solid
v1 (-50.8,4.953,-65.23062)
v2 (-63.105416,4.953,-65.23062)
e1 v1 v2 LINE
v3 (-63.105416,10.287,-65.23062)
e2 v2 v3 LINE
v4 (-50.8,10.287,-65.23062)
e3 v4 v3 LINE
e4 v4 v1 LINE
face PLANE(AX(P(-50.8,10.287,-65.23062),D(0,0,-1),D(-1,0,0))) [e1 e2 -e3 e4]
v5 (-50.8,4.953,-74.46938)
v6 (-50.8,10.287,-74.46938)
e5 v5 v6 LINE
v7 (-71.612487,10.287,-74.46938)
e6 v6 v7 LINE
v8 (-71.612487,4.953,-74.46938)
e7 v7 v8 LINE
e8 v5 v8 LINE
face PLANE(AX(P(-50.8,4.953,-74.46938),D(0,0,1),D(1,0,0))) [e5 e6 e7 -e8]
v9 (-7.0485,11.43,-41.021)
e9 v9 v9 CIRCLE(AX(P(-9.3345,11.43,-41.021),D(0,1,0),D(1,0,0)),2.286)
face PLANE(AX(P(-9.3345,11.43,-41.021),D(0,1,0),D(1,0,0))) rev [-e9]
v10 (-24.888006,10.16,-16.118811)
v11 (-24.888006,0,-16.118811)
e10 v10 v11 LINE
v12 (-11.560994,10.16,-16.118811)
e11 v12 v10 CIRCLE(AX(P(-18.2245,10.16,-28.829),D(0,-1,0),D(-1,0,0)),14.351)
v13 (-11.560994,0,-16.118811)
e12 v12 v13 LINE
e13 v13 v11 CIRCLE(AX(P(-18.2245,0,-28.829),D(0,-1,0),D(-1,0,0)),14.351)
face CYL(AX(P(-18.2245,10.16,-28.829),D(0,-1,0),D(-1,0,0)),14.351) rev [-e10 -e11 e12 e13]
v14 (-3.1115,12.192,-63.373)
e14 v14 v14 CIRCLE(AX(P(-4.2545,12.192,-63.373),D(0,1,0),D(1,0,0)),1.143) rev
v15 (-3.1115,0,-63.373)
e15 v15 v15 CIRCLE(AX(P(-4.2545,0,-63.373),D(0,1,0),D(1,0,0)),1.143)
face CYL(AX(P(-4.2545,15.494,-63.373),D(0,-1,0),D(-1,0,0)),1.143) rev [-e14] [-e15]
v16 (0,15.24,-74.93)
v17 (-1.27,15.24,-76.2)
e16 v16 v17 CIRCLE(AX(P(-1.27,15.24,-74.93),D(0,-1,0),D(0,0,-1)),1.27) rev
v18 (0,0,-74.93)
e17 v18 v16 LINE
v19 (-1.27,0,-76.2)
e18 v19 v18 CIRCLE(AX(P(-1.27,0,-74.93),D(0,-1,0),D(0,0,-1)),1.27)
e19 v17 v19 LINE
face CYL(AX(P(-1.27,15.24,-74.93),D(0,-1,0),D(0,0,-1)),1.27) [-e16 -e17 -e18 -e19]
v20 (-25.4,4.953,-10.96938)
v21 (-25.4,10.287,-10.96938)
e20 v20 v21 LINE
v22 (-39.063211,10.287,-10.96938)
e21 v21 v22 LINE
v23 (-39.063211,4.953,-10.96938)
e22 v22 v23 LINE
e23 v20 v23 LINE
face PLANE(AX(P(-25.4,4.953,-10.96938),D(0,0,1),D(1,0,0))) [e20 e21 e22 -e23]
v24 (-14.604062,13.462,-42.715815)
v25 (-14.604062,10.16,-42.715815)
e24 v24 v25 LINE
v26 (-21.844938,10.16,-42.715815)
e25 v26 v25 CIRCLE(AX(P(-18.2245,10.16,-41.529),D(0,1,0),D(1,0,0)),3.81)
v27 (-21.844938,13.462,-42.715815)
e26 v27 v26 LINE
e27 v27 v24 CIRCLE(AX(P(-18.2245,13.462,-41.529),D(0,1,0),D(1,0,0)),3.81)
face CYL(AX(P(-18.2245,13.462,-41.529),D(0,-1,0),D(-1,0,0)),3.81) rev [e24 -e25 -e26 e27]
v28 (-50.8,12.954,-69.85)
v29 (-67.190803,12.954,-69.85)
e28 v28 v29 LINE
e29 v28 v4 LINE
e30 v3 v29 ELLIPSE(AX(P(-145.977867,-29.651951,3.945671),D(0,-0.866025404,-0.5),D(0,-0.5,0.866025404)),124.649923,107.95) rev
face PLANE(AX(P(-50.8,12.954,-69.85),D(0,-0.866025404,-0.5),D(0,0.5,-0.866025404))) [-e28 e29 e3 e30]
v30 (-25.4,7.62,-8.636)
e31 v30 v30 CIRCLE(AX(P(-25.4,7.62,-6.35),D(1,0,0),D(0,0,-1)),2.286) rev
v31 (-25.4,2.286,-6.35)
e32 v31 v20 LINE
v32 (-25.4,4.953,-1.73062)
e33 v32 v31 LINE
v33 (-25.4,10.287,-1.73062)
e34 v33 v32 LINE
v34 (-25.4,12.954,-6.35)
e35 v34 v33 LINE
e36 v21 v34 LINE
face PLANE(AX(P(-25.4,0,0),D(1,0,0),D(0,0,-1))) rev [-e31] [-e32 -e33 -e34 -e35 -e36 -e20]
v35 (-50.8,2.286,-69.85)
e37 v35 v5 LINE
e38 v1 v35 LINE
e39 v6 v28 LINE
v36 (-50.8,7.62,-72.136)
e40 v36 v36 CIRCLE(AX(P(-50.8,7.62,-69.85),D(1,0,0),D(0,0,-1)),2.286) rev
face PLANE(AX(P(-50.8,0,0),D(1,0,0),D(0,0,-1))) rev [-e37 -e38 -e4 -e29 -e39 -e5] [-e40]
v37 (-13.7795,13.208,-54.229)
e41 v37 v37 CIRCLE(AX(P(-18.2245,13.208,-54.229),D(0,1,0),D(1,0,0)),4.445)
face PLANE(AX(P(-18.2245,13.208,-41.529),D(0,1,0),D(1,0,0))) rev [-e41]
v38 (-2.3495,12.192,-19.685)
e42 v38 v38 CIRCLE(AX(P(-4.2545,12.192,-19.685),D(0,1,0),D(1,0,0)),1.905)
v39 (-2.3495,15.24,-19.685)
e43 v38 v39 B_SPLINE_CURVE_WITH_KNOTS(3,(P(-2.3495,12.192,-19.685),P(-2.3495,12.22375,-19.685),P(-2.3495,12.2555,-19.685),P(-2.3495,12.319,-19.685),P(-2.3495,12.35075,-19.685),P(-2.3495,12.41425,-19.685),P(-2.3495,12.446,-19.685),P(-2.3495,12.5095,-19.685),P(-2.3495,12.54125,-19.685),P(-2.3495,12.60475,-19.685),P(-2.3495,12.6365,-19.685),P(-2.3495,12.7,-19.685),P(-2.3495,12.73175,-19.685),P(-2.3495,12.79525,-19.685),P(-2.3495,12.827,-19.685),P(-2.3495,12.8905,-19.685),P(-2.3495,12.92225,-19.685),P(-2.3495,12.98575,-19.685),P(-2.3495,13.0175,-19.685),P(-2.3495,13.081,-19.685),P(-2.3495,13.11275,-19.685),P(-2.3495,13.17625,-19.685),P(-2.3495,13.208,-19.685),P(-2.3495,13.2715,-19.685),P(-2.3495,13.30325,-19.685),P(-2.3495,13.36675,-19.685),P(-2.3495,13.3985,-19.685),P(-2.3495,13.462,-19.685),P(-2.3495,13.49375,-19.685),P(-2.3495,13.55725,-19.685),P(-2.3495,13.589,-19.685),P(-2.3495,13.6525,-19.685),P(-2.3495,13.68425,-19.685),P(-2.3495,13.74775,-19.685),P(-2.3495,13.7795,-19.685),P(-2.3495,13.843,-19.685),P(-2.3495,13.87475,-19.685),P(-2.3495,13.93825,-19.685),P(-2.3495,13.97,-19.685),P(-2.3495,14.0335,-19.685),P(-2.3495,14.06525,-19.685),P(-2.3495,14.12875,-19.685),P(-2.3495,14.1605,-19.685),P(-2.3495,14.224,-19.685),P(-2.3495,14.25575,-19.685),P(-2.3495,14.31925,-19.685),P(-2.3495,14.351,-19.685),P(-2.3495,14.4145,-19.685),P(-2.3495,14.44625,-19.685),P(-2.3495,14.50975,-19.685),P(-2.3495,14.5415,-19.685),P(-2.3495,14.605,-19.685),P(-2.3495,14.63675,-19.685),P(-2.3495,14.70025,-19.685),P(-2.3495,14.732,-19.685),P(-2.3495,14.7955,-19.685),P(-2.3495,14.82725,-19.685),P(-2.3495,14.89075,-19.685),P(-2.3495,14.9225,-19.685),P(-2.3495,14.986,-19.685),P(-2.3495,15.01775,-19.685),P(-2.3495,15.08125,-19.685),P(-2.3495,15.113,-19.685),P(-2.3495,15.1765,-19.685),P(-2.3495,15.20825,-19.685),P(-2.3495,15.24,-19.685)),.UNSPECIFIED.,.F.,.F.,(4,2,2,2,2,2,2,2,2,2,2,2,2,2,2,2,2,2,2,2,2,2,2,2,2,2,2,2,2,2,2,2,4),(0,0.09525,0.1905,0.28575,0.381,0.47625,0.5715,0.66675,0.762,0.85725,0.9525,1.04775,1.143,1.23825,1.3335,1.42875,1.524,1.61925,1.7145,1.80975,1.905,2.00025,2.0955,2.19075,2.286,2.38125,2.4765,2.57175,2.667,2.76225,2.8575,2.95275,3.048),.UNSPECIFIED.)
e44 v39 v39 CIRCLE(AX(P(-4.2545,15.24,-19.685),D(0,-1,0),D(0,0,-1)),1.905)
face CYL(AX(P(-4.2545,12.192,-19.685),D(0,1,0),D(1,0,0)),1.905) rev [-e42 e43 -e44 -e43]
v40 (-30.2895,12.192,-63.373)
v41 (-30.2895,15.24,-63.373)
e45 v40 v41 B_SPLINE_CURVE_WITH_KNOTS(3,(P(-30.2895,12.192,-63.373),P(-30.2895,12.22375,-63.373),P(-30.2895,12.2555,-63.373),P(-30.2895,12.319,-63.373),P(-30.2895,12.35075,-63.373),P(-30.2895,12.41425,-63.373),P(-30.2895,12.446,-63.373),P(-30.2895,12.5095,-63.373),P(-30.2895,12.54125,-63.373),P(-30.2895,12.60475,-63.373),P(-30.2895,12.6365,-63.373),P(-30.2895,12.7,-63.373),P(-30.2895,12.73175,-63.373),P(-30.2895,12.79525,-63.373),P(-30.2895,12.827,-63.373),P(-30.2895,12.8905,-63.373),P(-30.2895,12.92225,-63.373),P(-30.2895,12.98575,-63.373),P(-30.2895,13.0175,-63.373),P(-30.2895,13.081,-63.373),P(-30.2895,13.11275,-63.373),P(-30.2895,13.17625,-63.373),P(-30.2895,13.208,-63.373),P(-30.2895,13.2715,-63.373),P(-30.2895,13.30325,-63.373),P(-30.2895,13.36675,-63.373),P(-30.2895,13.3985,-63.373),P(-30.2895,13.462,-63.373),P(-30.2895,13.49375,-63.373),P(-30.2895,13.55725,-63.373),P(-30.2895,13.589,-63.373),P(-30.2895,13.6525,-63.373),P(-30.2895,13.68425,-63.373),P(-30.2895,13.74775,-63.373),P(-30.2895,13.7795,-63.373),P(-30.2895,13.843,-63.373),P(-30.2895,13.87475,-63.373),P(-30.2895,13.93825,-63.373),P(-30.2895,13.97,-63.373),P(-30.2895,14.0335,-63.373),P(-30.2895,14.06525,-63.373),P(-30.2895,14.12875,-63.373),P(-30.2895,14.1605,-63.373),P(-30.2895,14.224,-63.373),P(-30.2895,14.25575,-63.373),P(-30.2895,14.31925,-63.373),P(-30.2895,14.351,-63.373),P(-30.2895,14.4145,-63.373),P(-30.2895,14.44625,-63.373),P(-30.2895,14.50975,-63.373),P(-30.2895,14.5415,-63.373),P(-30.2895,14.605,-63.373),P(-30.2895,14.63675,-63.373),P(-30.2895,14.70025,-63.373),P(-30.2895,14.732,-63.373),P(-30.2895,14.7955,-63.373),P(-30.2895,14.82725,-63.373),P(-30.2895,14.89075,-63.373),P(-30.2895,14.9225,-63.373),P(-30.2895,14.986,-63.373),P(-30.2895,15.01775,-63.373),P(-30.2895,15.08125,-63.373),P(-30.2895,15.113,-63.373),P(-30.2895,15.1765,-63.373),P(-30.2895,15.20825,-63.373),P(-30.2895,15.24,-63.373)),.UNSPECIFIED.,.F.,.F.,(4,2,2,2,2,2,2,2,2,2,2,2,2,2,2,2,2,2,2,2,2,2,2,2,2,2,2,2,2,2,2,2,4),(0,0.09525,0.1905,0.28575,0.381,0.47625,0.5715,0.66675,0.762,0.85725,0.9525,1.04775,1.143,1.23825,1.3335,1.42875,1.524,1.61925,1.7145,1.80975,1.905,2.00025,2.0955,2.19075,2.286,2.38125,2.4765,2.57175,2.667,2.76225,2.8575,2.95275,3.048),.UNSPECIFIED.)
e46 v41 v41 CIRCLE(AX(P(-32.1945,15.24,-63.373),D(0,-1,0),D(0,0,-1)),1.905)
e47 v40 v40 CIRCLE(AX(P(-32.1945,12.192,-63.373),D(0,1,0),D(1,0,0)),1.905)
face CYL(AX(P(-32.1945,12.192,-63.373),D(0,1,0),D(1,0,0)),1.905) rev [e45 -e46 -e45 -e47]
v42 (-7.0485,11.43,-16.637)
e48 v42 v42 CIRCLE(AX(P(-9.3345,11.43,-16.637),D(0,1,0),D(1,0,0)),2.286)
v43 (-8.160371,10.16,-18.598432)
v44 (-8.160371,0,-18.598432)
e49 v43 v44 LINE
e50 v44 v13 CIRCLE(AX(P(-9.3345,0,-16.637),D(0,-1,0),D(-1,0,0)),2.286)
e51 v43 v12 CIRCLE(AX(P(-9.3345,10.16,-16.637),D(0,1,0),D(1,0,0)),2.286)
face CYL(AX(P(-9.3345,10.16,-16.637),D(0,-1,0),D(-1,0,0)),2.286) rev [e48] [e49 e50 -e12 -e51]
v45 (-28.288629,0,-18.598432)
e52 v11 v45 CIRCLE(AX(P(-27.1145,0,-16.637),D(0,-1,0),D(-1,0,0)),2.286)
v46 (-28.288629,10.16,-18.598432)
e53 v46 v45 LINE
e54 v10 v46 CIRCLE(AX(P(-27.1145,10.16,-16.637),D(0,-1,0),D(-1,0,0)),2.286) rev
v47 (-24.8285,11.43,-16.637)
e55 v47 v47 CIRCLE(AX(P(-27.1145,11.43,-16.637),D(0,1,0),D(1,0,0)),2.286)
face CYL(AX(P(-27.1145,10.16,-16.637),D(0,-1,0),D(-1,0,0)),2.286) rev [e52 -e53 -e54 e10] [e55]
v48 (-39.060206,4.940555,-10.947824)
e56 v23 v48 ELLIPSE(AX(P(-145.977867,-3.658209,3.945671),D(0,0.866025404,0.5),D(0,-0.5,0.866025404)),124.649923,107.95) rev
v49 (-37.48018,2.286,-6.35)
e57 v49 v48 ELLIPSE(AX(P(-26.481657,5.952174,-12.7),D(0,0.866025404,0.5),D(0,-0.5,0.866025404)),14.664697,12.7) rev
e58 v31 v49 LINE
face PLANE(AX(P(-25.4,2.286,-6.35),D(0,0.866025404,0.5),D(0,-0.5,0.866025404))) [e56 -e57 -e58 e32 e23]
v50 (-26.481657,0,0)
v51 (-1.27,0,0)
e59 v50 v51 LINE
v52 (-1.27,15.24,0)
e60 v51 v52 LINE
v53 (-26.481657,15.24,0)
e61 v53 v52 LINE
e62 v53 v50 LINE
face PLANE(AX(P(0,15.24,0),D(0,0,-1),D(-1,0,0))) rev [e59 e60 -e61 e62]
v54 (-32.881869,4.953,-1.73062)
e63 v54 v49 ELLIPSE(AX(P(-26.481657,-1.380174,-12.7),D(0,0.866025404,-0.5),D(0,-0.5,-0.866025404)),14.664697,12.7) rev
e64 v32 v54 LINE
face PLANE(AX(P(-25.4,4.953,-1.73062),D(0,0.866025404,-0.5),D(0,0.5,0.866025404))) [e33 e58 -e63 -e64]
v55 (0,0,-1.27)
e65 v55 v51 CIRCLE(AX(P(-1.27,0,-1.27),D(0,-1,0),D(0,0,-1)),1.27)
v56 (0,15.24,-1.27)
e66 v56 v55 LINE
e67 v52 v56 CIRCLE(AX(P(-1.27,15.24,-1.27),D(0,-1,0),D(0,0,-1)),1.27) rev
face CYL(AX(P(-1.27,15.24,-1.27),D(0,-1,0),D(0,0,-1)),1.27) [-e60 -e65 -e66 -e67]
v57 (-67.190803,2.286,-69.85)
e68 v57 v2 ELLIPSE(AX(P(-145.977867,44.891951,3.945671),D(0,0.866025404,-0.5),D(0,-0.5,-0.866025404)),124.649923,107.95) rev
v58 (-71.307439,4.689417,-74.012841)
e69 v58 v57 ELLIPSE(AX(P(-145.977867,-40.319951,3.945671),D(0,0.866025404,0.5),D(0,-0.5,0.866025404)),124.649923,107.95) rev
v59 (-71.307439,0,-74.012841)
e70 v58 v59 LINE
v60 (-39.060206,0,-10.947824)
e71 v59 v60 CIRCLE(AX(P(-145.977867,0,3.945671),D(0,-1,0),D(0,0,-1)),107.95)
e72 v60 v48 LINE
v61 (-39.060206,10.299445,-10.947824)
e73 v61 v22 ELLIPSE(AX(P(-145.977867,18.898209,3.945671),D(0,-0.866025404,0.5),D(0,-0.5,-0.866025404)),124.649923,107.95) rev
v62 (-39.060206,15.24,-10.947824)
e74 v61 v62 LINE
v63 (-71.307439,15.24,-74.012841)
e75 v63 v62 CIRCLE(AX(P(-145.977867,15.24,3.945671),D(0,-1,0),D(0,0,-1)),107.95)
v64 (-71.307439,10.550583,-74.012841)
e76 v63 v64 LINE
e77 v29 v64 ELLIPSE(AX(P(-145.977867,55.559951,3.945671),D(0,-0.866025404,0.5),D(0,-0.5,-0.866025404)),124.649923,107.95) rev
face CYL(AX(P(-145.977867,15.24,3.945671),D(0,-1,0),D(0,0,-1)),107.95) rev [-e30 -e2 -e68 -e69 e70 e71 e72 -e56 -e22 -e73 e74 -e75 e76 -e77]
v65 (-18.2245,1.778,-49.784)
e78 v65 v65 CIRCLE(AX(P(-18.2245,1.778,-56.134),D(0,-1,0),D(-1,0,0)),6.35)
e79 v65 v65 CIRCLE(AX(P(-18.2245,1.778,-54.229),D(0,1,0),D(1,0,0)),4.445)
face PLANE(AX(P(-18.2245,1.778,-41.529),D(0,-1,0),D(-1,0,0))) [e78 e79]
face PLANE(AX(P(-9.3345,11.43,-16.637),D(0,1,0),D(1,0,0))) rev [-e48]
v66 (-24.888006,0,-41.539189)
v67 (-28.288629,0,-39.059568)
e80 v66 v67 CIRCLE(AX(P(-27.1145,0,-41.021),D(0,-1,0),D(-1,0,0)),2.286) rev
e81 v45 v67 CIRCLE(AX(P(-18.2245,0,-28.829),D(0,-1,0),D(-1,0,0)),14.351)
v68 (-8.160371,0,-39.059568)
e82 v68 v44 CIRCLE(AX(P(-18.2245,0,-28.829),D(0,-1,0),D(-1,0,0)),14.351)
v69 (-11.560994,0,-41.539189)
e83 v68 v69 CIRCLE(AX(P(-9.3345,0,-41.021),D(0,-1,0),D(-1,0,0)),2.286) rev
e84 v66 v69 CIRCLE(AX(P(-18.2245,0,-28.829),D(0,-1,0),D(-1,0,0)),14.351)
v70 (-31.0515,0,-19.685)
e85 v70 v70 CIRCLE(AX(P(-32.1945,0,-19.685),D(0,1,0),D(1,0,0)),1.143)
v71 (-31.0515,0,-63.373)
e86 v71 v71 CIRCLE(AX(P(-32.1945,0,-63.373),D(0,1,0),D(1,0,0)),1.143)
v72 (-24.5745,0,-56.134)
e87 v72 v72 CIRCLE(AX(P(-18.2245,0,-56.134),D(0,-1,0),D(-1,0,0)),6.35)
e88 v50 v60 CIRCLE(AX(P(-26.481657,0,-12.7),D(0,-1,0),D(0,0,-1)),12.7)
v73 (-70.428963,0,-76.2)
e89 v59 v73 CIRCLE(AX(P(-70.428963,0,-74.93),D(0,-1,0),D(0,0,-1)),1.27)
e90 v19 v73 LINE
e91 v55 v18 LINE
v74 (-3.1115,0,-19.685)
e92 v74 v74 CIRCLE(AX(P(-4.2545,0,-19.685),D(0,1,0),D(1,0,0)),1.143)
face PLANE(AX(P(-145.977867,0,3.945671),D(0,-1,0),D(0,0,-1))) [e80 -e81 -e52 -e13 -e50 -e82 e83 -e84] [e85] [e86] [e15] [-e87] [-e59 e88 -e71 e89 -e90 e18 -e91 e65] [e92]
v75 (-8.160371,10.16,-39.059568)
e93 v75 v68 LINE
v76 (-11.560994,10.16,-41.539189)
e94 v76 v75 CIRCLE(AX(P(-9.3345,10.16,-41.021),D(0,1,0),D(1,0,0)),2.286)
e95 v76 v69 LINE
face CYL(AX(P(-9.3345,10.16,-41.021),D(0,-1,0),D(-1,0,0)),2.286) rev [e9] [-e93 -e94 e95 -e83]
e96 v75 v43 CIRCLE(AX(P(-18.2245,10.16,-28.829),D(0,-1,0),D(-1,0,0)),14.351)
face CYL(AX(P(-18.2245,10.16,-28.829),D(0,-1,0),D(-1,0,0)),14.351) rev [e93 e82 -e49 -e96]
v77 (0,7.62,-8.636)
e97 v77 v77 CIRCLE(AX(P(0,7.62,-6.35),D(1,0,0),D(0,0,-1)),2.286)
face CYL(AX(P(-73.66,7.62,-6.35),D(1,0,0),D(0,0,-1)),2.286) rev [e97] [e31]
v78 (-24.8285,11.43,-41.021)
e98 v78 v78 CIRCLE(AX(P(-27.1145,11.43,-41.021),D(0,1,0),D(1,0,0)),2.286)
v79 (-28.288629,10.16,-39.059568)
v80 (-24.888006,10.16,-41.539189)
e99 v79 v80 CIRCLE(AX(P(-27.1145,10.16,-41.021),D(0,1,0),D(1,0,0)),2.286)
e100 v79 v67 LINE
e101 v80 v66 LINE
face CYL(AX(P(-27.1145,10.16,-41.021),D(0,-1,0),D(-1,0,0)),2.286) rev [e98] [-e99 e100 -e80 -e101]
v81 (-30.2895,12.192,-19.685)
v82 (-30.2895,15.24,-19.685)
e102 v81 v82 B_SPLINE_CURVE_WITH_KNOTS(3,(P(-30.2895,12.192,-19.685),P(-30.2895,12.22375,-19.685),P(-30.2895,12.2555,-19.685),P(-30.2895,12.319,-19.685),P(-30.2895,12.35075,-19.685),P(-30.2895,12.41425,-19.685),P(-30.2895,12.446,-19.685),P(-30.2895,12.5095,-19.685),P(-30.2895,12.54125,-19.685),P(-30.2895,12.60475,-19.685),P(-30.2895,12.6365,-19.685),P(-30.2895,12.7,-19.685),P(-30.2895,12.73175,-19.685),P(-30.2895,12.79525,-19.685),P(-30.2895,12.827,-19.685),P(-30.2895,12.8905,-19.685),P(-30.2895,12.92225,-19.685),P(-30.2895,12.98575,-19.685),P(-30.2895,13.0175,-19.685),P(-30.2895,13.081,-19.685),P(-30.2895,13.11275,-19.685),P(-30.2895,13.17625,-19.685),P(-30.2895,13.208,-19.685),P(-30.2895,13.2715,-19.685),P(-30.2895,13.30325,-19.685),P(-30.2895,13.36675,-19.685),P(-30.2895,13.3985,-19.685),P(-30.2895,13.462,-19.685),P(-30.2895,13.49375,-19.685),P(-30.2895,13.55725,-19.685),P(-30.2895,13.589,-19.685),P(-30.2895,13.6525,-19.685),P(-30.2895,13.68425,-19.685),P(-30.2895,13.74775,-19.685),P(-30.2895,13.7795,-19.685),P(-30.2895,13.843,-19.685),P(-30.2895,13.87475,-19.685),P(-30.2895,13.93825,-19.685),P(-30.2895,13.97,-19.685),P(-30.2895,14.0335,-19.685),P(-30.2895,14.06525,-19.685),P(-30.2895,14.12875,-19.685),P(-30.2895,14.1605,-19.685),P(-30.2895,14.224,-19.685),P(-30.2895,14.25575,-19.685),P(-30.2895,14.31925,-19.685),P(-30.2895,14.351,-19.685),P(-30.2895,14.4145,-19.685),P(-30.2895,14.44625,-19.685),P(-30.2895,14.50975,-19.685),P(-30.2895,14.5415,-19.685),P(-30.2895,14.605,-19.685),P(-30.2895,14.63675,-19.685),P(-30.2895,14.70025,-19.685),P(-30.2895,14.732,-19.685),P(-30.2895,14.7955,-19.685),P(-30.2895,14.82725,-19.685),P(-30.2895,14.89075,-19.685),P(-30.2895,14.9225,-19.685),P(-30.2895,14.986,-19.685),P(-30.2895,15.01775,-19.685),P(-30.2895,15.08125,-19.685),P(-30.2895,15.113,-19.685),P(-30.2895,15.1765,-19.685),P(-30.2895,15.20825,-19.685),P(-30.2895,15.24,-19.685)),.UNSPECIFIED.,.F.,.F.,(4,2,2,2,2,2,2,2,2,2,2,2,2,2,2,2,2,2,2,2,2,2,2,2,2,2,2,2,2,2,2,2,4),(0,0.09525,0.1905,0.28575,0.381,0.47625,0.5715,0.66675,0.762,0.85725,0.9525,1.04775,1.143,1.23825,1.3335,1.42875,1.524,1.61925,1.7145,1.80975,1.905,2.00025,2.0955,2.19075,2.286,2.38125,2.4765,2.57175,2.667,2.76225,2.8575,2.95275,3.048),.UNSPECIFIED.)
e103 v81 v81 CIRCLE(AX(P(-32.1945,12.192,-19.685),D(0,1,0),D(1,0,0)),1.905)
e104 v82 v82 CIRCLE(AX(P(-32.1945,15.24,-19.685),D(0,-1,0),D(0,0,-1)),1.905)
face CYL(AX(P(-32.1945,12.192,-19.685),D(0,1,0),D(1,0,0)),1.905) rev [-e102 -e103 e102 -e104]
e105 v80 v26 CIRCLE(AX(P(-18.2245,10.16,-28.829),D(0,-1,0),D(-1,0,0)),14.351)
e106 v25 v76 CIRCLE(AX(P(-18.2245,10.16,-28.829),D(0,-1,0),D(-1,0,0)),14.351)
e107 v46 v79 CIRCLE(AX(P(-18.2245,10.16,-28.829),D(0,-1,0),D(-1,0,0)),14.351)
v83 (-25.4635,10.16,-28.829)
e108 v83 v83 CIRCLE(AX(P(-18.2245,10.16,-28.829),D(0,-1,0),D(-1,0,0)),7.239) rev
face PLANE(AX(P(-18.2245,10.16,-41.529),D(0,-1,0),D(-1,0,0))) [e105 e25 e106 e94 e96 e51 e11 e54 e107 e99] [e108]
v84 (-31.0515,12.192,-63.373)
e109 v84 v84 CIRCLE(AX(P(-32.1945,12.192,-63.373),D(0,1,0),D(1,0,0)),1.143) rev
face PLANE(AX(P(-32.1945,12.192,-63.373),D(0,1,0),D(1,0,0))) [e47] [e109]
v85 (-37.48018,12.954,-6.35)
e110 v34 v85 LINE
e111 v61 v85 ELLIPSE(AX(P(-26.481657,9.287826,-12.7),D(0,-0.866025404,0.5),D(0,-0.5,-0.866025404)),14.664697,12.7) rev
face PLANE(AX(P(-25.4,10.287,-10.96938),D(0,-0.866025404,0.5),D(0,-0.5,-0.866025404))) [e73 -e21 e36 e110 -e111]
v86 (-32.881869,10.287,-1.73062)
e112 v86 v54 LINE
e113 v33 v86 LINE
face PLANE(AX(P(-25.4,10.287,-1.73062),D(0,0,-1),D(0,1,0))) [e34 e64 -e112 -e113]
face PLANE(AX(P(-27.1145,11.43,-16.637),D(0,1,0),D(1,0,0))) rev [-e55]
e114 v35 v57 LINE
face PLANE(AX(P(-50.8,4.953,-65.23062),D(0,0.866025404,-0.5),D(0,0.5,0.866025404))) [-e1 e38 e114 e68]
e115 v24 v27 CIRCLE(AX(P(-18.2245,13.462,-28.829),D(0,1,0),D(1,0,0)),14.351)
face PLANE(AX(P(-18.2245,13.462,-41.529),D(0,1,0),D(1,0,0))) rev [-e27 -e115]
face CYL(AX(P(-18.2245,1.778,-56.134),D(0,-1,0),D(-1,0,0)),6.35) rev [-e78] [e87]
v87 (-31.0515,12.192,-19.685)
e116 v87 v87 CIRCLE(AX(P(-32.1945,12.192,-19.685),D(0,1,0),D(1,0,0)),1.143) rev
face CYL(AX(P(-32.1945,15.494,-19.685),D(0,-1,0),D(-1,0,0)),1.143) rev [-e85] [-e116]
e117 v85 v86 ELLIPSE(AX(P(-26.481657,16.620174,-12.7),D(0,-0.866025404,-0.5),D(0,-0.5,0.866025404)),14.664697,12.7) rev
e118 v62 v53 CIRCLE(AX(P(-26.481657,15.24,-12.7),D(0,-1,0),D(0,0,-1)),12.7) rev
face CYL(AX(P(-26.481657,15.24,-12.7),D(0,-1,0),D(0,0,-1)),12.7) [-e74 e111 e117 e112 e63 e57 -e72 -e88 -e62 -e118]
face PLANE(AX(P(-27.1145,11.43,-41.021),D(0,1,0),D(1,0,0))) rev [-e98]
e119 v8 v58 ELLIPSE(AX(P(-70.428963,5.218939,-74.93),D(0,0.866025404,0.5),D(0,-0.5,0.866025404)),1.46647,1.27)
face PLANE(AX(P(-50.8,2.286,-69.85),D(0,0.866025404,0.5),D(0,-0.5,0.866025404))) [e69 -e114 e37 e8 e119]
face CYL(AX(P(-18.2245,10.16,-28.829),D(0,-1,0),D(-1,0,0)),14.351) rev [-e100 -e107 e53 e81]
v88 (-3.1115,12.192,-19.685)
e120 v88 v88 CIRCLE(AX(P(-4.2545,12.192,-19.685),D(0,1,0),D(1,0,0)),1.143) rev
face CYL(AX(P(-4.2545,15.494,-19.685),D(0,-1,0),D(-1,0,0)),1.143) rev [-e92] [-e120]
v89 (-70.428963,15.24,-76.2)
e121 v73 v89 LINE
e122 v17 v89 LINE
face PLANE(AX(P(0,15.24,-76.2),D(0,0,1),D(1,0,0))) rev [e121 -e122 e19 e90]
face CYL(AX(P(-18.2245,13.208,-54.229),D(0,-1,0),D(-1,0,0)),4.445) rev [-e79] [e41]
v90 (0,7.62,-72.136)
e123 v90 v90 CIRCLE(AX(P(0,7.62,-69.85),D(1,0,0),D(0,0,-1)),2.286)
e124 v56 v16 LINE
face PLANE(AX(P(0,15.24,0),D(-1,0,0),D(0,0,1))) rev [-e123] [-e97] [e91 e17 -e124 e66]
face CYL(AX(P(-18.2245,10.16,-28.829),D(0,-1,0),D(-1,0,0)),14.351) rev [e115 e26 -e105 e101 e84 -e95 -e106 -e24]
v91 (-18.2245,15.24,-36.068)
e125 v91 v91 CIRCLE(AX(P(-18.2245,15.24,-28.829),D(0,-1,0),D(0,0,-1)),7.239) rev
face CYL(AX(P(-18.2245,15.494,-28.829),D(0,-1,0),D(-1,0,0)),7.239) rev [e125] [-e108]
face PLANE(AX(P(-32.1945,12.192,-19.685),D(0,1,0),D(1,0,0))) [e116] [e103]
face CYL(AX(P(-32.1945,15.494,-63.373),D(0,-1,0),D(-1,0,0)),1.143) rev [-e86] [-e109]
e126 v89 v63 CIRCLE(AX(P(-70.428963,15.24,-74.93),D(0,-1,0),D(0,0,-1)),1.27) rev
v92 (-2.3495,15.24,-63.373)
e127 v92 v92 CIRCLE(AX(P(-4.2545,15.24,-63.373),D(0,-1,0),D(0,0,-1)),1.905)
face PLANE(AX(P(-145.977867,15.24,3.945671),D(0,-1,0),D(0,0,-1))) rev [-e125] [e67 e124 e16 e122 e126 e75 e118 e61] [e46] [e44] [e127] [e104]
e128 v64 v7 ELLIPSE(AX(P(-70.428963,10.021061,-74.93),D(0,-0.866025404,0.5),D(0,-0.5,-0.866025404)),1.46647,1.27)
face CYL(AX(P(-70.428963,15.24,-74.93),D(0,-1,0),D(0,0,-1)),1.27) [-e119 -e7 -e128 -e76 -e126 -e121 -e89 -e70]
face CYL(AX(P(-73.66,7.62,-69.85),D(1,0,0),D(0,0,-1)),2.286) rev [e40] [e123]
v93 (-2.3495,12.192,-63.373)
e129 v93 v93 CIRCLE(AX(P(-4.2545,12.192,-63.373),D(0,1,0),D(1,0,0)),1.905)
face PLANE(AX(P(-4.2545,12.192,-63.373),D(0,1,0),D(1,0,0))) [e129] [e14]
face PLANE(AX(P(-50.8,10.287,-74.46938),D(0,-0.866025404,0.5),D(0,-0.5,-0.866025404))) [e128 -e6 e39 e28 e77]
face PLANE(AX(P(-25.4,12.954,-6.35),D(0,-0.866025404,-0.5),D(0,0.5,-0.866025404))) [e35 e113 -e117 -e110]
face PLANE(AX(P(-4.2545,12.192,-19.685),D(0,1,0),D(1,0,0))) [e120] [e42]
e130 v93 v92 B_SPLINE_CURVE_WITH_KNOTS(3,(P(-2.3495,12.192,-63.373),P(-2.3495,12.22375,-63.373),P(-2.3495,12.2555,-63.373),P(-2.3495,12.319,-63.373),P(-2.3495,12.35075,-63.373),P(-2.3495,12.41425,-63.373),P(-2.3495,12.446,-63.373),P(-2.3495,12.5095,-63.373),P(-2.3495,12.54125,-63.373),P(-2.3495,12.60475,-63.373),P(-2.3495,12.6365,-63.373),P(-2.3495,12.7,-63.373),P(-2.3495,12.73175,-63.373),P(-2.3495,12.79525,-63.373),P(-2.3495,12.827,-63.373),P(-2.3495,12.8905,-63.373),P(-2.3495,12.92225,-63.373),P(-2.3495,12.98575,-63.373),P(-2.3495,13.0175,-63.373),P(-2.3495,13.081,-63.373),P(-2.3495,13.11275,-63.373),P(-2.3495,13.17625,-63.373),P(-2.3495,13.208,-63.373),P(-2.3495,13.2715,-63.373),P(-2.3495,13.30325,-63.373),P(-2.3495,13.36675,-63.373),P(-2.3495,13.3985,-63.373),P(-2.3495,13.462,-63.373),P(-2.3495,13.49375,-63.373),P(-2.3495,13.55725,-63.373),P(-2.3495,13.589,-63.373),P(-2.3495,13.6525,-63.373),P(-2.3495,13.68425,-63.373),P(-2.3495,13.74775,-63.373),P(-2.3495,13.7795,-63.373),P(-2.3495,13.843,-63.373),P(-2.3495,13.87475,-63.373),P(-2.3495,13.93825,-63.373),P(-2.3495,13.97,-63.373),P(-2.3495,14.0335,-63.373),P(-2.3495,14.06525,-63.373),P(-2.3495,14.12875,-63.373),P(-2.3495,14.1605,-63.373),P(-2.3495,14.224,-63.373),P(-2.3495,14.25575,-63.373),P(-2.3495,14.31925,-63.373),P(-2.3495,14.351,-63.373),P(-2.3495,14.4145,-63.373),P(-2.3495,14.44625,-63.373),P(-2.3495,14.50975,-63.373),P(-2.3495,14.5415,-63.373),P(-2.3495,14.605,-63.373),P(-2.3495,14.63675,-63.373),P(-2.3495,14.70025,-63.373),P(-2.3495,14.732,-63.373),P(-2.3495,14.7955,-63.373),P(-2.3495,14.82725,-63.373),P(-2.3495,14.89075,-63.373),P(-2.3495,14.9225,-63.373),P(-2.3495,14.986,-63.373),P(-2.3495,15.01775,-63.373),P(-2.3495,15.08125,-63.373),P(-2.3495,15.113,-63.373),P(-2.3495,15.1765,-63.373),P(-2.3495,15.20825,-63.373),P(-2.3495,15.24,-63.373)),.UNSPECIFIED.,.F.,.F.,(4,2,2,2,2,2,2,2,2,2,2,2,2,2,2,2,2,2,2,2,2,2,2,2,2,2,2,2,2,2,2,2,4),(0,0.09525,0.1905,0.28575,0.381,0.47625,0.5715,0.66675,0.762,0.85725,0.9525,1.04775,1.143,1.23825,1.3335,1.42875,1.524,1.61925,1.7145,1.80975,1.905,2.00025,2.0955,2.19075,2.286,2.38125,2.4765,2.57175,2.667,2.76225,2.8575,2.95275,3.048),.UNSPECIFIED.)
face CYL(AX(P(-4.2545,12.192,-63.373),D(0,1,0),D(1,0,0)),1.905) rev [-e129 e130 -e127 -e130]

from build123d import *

# Parameters (mm, degrees)
BOSS_EXTRUDE1_DEPTH   = 15.24
CAVITY1_OUTLINE_R     = 4.445
CAVITY1_OUTLINE_R_2   = 1.143
CAVITY1_DEPTH         = 10.16
CAVITY1_START         = 10.16
CAVITY1_2_OUTLINE_R   = 1.143
CAVITY1_2_OUTLINE_R_2 = 7.239
CAVITY1_2_DEPTH       = 5.08
CAVITY1_3_OUTLINE_R   = 4.445
CAVITY1_3_DEPTH       = 3.048
CAVITY1_4_DEPTH       = 1.778
CAVITY1_START_2       = 12.192
CAVITY1_5_OUTLINE_R   = 1.905
CAVITY1_5_OUTLINE_R_2 = 1.143
CAVITY1_5_DEPTH       = 3.048
CAVITY1_6_OUTLINE_R   = 2.286
CAVITY1_6_DEPTH       = 1.27
CAVITY1_START_3       = 13.208
CAVITY1_7_DEPTH       = 0.254
FILLET1_R             = 12.7
SKETCH2_R             = 2.286
CUT_EXTRUDE1_DEPTH    = 108.072373654
CUT_EXTRUDE2_DEPTH    = 50.8
CUT_EXTRUDE4_DEPTH    = 25.4
FILLET2_R             = 1.27


# Read off the part's stored shape, not the designer's step: Cavity1
with BuildPart() as part:
    # Sketch1 → Boss-Extrude1 (new body)
    with BuildSketch(Plane(origin=(0, 0, 0), x_dir=(1, 0, 0), z_dir=(0, 1, 0))):
        with BuildLine():
            Line((0, 0), (0, 76.2))
            Line((0, 76.2), (-73.66, 76.2))
            ThreePointArc((-73.66, 76.2), (-48.155396991, 41.704814738), (-38.1, 0))
            Line((-38.1, 0), (0, 0))
        make_face()
    extrude(amount=BOSS_EXTRUDE1_DEPTH)

    # Cavity1 outline → Cavity1 (cut)
    with BuildSketch(Plane(origin=(0, 0, 0), x_dir=(1, 0, 0), z_dir=(0, 1, 0))):
        with BuildLine():
            ThreePointArc((-11.560994253, 41.539188518), (-18.2245, 43.18), (-24.888005747, 41.539188518))
            ThreePointArc((-24.888005747, 41.539188518), (-28.461347552, 42.868105214), (-28.288628852, 39.059567504))
            ThreePointArc((-28.288628852, 39.059567504), (-32.5755, 28.829), (-28.288628852, 18.598432496))
            ThreePointArc((-28.288628852, 18.598432496), (-28.461347552, 14.789894786), (-24.888005747, 16.118811482))
            ThreePointArc((-24.888005747, 16.118811482), (-18.2245, 14.478), (-11.560994253, 16.118811482))
            ThreePointArc((-11.560994253, 16.118811482), (-7.987652448, 14.789894786), (-8.160371148, 18.598432496))
            ThreePointArc((-8.160371148, 18.598432496), (-3.8735, 28.829), (-8.160371148, 39.059567504))
            ThreePointArc((-8.160371148, 39.059567504), (-7.987652448, 42.868105214), (-11.560994253, 41.539188518))
        make_face()
        with Locations((-18.2245, 54.229)):
            Circle(CAVITY1_OUTLINE_R)
        with Locations((-4.2545, 63.373)):
            Circle(CAVITY1_OUTLINE_R_2)
        with Locations((-32.1945, 63.373)):
            Circle(CAVITY1_OUTLINE_R_2)
        with Locations((-4.2545, 19.685)):
            Circle(CAVITY1_OUTLINE_R_2)
        with Locations((-32.1945, 19.685)):
            Circle(CAVITY1_OUTLINE_R_2)
    extrude(amount=CAVITY1_DEPTH, mode=Mode.SUBTRACT)

    # Cavity1 2 outline → Cavity1 2 (cut)
    with BuildSketch(Plane(origin=(0, 0, 0), x_dir=(1, 0, 0), z_dir=(0, 1, 0)).offset(CAVITY1_START)):
        with Locations((-4.2545, 63.373)):
            Circle(CAVITY1_2_OUTLINE_R)
        with Locations((-32.1945, 63.373)):
            Circle(CAVITY1_2_OUTLINE_R)
        with Locations((-4.2545, 19.685)):
            Circle(CAVITY1_2_OUTLINE_R)
        with Locations((-32.1945, 19.685)):
            Circle(CAVITY1_2_OUTLINE_R)
        with Locations((-18.2245, 28.829)):
            Circle(CAVITY1_2_OUTLINE_R_2)
    extrude(amount=CAVITY1_2_DEPTH, mode=Mode.SUBTRACT)

    # Cavity1 3 outline → Cavity1 3 (cut)
    with BuildSketch(Plane(origin=(0, 0, 0), x_dir=(1, 0, 0), z_dir=(0, 1, 0)).offset(CAVITY1_START)):
        with BuildLine():
            ThreePointArc((-21.84493784, 42.715815), (-18.2245, 37.719), (-14.60406216, 42.715815))
            ThreePointArc((-14.60406216, 42.715815), (-18.2245, 43.18), (-21.84493784, 42.715815))
        make_face()
        with Locations((-18.2245, 54.229)):
            Circle(CAVITY1_3_OUTLINE_R)
    extrude(amount=CAVITY1_3_DEPTH, mode=Mode.SUBTRACT)

    # Cavity1 4 outline → Cavity1 4 (cut)
    with BuildSketch(Plane(origin=(0, 0, 0), x_dir=(1, 0, 0), z_dir=(0, 1, 0))):
        with BuildLine():
            Line((-16.979413564, 49.961941907), (-16.962599029, 49.910648336))
            ThreePointArc((-16.962599029, 49.910648336), (-13.643456381, 51.73666679), (-11.954738237, 55.127725966))
            Line((-11.954738237, 55.127725966), (-13.895987251, 53.218058667))
            ThreePointArc((-13.895987251, 53.218058667), (-14.996989185, 51.172662495), (-16.979413564, 49.961941907))
        make_face()
        with BuildLine():
            ThreePointArc((-17.321192174, 49.848577582), (-17.141450842, 49.87704351), (-16.962599029, 49.910648336))
            Line((-16.962599029, 49.910648336), (-16.979413564, 49.961941907))
            ThreePointArc((-16.979413564, 49.961941907), (-17.131364048, 49.920510846), (-17.284686925, 49.884488936))
            Line((-17.284686925, 49.884488936), (-17.321192174, 49.848577582))
        make_face()
        with BuildLine():
            Line((-19.469586436, 49.961941907), (-19.486400971, 49.910648336))
            ThreePointArc((-19.486400971, 49.910648336), (-19.307549158, 49.87704351), (-19.127807826, 49.848577582))
            Line((-19.127807826, 49.848577582), (-19.164313075, 49.884488936))
            ThreePointArc((-19.164313075, 49.884488936), (-19.317635952, 49.920510846), (-19.469586436, 49.961941907))
        make_face()
        with BuildLine():
            ThreePointArc((-24.494261763, 55.127725966), (-22.805543619, 51.73666679), (-19.486400971, 49.910648336))
            Line((-19.486400971, 49.910648336), (-19.469586436, 49.961941907))
            ThreePointArc((-19.469586436, 49.961941907), (-21.452010815, 51.172662495), (-22.553012749, 53.218058667))
            Line((-22.553012749, 53.218058667), (-24.494261763, 55.127725966))
        make_face()
        with BuildLine():
            ThreePointArc((-18.2245, 49.784), (-17.771693393, 49.800164971), (-17.321192174, 49.848577582))
            Line((-17.321192174, 49.848577582), (-17.284686925, 49.884488936))
            ThreePointArc((-17.284686925, 49.884488936), (-17.751914917, 49.809193631), (-18.2245, 49.784))
        make_face()
        with BuildLine():
            Line((-13.895987251, 53.218058667), (-11.954738237, 55.127725966))
            ThreePointArc((-11.954738237, 55.127725966), (-11.894591344, 55.629266009), (-11.8745, 56.134))
            ThreePointArc((-11.8745, 56.134), (-12.87382539, 59.553470897), (-15.557265738, 61.896669641))
            Line((-15.557265738, 61.896669641), (-16.701846661, 58.405068942))
            ThreePointArc((-16.701846661, 58.405068942), (-14.582644766, 56.7775124), (-13.7795, 54.229))
            ThreePointArc((-13.7795, 54.229), (-13.80871784, 53.720184793), (-13.895987251, 53.218058667))
        make_face()
        with BuildLine():
            Line((-19.164313075, 49.884488936), (-19.127807826, 49.848577582))
            ThreePointArc((-19.127807826, 49.848577582), (-18.677306607, 49.800164971), (-18.2245, 49.784))
            ThreePointArc((-18.2245, 49.784), (-18.697085083, 49.809193631), (-19.164313075, 49.884488936))
        make_face()
        with BuildLine():
            ThreePointArc((-20.891734262, 61.896669641), (-23.830044051, 59.117349777), (-24.494261763, 55.127725966))
            Line((-24.494261763, 55.127725966), (-22.553012749, 53.218058667))
            ThreePointArc((-22.553012749, 53.218058667), (-22.134142573, 56.3438806), (-19.747153339, 58.405068942))
            Line((-19.747153339, 58.405068942), (-20.891734262, 61.896669641))
        make_face()
        with BuildLine():
            ThreePointArc((-15.557265738, 61.896669641), (-18.2245, 62.484), (-20.891734262, 61.896669641))
            Line((-20.891734262, 61.896669641), (-19.747153339, 58.405068942))
            ThreePointArc((-19.747153339, 58.405068942), (-18.2245, 58.674), (-16.701846661, 58.405068942))
            Line((-16.701846661, 58.405068942), (-15.557265738, 61.896669641))
        make_face()
    extrude(amount=CAVITY1_4_DEPTH, mode=Mode.SUBTRACT)

    # Cavity1 5 outline → Cavity1 5 (cut)
    # profile 1 of 4: a face of its own
    with BuildSketch(Plane(origin=(0, 0, 0), x_dir=(1, 0, 0), z_dir=(0, 1, 0)).offset(CAVITY1_START_2)):
        with Locations((-4.2545, 63.373)):
            Circle(CAVITY1_5_OUTLINE_R)
        with Locations((-4.2545, 63.373)):
            Circle(CAVITY1_5_OUTLINE_R_2, mode=Mode.SUBTRACT)
    # profile 2 of 4: a face of its own
    with BuildSketch(Plane(origin=(0, 0, 0), x_dir=(1, 0, 0), z_dir=(0, 1, 0)).offset(CAVITY1_START_2)):
        with Locations((-32.1945, 63.373)):
            Circle(CAVITY1_5_OUTLINE_R)
        with Locations((-32.1945, 63.373)):
            Circle(CAVITY1_5_OUTLINE_R_2, mode=Mode.SUBTRACT)
    # profile 3 of 4: a face of its own
    with BuildSketch(Plane(origin=(0, 0, 0), x_dir=(1, 0, 0), z_dir=(0, 1, 0)).offset(CAVITY1_START_2)):
        with Locations((-4.2545, 19.685)):
            Circle(CAVITY1_5_OUTLINE_R)
        with Locations((-4.2545, 19.685)):
            Circle(CAVITY1_5_OUTLINE_R_2, mode=Mode.SUBTRACT)
    # profile 4 of 4: a face of its own
    with BuildSketch(Plane(origin=(0, 0, 0), x_dir=(1, 0, 0), z_dir=(0, 1, 0)).offset(CAVITY1_START_2)):
        with Locations((-32.1945, 19.685)):
            Circle(CAVITY1_5_OUTLINE_R)
        with Locations((-32.1945, 19.685)):
            Circle(CAVITY1_5_OUTLINE_R_2, mode=Mode.SUBTRACT)
    extrude(amount=CAVITY1_5_DEPTH, mode=Mode.SUBTRACT)

    # Cavity1 6 outline → Cavity1 6 (cut)
    with BuildSketch(Plane(origin=(0, 0, 0), x_dir=(1, 0, 0), z_dir=(0, 1, 0)).offset(CAVITY1_START)):
        with Locations((-9.3345, 41.021)):
            Circle(CAVITY1_6_OUTLINE_R)
        with Locations((-27.1145, 41.021)):
            Circle(CAVITY1_6_OUTLINE_R)
        with Locations((-9.3345, 16.637)):
            Circle(CAVITY1_6_OUTLINE_R)
        with Locations((-27.1145, 16.637)):
            Circle(CAVITY1_6_OUTLINE_R)
    extrude(amount=CAVITY1_6_DEPTH, mode=Mode.SUBTRACT)

    # Cavity1 7 outline → Cavity1 7 (cut)
    with BuildSketch(Plane(origin=(0, 0, 0), x_dir=(1, 0, 0), z_dir=(0, 1, 0)).offset(CAVITY1_START_3)):
        with BuildLine():
            ThreePointArc((-21.84493784, 42.715815), (-18.2245, 37.719), (-14.60406216, 42.715815))
            ThreePointArc((-14.60406216, 42.715815), (-18.2245, 43.18), (-21.84493784, 42.715815))
        make_face()
    extrude(amount=CAVITY1_7_DEPTH, mode=Mode.SUBTRACT)

    # Fillet1
    fillet1_edges = [part.edges().sort_by_distance(p)[0] for p in [
        (-38.1, 7.62, 0),
    ]]
    fillet(fillet1_edges, radius=FILLET1_R)

    # Sketch2 → Cut-Extrude1 (cut, through all)
    with BuildSketch(Plane(origin=(0, 0, 0), x_dir=(0, 0, -1), z_dir=(1, 0, 0))):
        with Locations((6.35, 7.62)):
            Circle(SKETCH2_R)
        with Locations((69.85, 7.62)):
            Circle(SKETCH2_R)
    extrude(amount=-CUT_EXTRUDE1_DEPTH, mode=Mode.SUBTRACT)

    # Sketch4 → Cut-Extrude2 (cut)
    with BuildSketch(Plane(origin=(-76.2, 0, 0), x_dir=(0, 0, -1), z_dir=(1, 0, 0))):
        Polygon((6.35, 2.286), (10.969379504, 4.953), (10.969379504, 10.287), (6.35, 12.954), (1.730620496, 10.287), (1.730620496, 4.953), align=None)
    extrude(amount=CUT_EXTRUDE2_DEPTH, mode=Mode.SUBTRACT)

    # Sketch4<4> → Cut-Extrude4 (cut)
    with BuildSketch(Plane(origin=(-76.2, 0, 0), x_dir=(0, 0, -1), z_dir=(1, 0, 0))):
        Polygon((69.85, 2.286), (74.469379504, 4.953), (74.469379504, 10.287), (69.85, 12.954), (65.230620496, 10.287), (65.230620496, 4.953), align=None)
    extrude(amount=CUT_EXTRUDE4_DEPTH, mode=Mode.SUBTRACT)

    # Fillet2
    # the kernel refuses this fillet: 1.27 mm, written as the material it takes off along each edge
    with BuildSketch(Plane(origin=(-73.66, -8.077592452, -76.2), x_dir=(0.7323839064135403, 0, 0.6808919250706698), z_dir=(0, 1, 0))) as fillet2_piece_1:
        with BuildLine():
            CenterArc((3.231092231, 1.269859429), FILLET2_R, 132.913380591, 136.234131595)
            Line((2.366359486, 2.19998699), (0, 0))
            ThreePointArc((0, 0), (1.606098477, 0.011948565), (3.212196954, 0))
        make_face()
    extrude(amount=31.395184904, mode=Mode.SUBTRACT)
    with BuildSketch(Plane(origin=(0, -3.175, 0), x_dir=(-1, 0, 0), z_dir=(0, 1, 0))) as fillet2_piece_2:
        with BuildLine():
            CenterArc((FILLET2_R, -FILLET2_R), FILLET2_R, 90, 90)
            Line((0, -FILLET2_R), (0, 0))
            Line((0, 0), (FILLET2_R, 0))
        make_face()
    extrude(amount=21.59, mode=Mode.SUBTRACT)
    with BuildSketch(Plane(origin=(0, -3.175, -76.2), x_dir=(-1, 0, 0), z_dir=(0, 1, 0))) as fillet2_piece_3:
        with BuildLine():
            CenterArc((FILLET2_R, FILLET2_R), FILLET2_R, 180, 90)
            Line((0, FILLET2_R), (0, 0))
            Line((0, 0), (FILLET2_R, 0))
        make_face()
    extrude(amount=21.59, mode=Mode.SUBTRACT)


solid = part.part
